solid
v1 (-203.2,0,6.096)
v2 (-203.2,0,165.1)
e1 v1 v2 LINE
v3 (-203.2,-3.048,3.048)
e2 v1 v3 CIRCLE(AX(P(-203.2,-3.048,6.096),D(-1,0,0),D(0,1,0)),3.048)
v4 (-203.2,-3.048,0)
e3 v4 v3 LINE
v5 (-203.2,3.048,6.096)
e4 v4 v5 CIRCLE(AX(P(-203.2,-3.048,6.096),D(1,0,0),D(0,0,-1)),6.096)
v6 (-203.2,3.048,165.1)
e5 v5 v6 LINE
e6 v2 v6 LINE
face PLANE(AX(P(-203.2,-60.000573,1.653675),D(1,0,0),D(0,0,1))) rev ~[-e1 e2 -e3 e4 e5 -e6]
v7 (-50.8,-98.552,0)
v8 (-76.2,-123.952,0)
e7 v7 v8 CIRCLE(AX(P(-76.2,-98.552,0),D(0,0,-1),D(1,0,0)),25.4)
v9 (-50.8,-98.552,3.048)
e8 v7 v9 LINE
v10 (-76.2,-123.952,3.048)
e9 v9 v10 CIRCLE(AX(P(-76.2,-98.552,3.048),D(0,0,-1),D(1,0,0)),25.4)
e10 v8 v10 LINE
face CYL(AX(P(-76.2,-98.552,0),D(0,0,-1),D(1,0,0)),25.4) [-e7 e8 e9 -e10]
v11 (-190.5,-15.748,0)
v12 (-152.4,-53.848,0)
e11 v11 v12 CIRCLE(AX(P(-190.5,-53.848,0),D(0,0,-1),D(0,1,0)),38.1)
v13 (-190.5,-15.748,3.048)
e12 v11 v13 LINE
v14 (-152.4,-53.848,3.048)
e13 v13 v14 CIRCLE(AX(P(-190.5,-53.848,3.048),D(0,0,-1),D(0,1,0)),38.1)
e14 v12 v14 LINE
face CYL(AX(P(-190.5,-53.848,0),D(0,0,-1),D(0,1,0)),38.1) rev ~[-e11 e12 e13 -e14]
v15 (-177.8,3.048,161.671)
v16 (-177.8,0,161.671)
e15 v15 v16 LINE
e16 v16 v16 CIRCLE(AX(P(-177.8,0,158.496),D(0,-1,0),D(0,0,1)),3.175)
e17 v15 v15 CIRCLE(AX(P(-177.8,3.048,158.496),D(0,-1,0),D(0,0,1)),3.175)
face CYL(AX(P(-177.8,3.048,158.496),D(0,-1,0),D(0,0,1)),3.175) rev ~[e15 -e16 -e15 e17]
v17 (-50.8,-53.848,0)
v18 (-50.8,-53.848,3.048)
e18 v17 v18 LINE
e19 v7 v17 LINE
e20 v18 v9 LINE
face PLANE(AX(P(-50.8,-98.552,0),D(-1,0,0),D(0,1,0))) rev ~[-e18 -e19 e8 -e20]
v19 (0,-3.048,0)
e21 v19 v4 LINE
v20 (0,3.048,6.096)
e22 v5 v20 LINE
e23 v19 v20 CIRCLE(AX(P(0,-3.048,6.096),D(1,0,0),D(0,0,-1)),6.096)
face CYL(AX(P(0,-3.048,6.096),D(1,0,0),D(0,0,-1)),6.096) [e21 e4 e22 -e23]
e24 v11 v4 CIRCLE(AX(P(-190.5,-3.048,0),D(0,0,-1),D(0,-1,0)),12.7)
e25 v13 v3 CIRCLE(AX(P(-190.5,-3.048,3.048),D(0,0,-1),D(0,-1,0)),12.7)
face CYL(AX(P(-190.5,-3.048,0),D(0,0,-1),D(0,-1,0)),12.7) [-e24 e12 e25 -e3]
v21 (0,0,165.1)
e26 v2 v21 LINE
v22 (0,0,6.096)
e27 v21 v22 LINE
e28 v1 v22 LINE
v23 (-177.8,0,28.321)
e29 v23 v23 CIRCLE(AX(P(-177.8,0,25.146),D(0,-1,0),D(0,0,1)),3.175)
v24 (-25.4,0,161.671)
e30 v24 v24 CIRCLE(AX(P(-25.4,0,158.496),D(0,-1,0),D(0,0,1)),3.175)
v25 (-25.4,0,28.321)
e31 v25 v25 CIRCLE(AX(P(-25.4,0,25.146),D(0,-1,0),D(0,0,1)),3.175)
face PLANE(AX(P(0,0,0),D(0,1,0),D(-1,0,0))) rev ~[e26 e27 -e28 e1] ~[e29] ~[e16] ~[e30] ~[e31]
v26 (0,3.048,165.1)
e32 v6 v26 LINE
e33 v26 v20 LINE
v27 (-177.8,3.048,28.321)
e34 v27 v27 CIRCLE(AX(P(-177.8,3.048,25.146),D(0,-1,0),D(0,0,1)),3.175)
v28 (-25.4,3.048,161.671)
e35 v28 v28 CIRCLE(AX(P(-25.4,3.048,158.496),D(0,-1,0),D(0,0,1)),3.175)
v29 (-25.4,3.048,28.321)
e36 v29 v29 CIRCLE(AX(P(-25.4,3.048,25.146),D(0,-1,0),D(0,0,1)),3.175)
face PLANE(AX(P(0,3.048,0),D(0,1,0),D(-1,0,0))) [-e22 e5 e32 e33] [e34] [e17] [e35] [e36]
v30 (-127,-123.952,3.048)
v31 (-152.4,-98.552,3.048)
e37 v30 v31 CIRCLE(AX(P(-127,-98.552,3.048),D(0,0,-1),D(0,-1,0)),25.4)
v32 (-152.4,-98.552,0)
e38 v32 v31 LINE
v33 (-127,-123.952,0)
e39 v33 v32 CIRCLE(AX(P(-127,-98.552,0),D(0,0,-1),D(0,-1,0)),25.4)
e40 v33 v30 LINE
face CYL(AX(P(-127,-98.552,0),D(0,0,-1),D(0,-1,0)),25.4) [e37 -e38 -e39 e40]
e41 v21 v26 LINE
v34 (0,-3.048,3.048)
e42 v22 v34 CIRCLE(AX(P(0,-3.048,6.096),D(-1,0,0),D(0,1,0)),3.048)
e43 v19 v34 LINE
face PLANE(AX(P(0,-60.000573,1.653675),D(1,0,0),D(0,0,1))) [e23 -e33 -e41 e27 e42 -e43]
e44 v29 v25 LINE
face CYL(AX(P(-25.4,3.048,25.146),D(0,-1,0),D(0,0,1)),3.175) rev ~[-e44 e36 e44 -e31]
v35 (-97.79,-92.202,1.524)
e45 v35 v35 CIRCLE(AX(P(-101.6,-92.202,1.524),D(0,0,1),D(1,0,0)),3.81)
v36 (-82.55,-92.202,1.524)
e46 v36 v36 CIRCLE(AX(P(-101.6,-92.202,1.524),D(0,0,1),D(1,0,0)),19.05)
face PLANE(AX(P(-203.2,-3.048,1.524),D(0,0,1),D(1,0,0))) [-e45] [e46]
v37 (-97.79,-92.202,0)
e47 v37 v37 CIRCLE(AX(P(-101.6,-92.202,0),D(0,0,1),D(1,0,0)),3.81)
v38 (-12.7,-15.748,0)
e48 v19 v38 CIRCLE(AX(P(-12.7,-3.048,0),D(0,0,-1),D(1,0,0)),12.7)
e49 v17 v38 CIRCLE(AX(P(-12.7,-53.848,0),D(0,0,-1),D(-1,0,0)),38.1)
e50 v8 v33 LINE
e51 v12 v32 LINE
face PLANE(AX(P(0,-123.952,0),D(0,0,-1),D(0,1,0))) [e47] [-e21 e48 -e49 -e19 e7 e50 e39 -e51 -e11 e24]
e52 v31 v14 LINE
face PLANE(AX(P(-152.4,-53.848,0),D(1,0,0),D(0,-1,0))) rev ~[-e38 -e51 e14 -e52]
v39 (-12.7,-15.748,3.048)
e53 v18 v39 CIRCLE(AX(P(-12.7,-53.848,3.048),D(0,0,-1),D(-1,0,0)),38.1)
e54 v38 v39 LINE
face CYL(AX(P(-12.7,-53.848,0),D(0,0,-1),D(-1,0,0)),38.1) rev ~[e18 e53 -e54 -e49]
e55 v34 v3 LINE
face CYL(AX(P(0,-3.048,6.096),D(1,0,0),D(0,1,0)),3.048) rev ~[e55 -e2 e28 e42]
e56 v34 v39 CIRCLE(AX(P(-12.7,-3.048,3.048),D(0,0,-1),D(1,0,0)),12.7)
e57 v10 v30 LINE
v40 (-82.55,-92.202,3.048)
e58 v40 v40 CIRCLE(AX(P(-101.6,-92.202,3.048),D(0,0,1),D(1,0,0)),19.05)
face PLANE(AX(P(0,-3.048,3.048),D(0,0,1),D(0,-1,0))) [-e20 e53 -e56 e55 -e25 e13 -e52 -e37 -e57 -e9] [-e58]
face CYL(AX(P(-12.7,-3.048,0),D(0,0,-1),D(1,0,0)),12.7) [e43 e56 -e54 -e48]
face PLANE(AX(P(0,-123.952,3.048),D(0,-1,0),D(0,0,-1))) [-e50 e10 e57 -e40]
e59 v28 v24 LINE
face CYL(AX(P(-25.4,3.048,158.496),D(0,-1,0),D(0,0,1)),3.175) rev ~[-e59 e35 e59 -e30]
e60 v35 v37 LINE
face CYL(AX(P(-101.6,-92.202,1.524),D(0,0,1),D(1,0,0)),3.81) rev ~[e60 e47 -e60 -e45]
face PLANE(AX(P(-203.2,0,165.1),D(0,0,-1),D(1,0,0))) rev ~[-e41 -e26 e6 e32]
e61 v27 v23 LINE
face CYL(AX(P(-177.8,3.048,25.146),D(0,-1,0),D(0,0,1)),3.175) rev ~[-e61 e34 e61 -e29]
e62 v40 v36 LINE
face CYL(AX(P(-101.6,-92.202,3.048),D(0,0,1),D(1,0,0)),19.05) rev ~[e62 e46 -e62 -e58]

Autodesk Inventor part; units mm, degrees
ref_plane "YZ Plane" through (0, 0, 0) normal (1, 0, 0) x (0, 1, 0)
ref_plane "XZ Plane" through (0, 0, 0) normal (0, 1, 0) x (-1, 0, 0)
ref_plane "XY Plane" through (0, 0, 0) normal (0, 0, 1) x (1, 0, 0)
sketch "Sketch1" plane through (0, 0, 0) normal (0, 1, 0) x (-1, 0, 0)
  line L0 (0, 0) -> (203.2, 0)
  line L1 (203.2, 0) -> (203.2, 165.1)
  line L2 (203.2, 165.1) -> (0, 165.1)
  line L3 (0, 165.1) -> (0, 0)
  dimension "d0" = 203.2
  dimension "d1" = 165.1
extrude "Plate2" add sketch "Sketch1" along normal blind 3.048
sketch "Sketch4" plane through (0, 3.048, 3.048) normal (0, 0, -1) x (-1, 0, 0)
  line L0 (203.2, 0) -> (0, 0)
  line L1 (0, 0) -> (0, -127)
  line L2 (0, -127) -> (203.2, -127)
  line L3 (203.2, -127) -> (203.2, 0)
edge flange "Flange1" height 127 angle 90 thickness 3.048 bend radius 3.048 thickness toward (0, 0, -1) relief straight relief width 3.048 relief depth 1.524 edges at (-101.6, 0, 0) wall of the first edge with corners at (-203.2, 3.048, 3.048) (0, 3.048, 3.048) (0, -123.952, 3.048) (-203.2, -123.952, 3.048)
bend "Bend1"
corner "Corner1"
sketch "Sketch5" plane through (0, 3.048, 0) normal (0, 1, 0) x (1, 0, 0)
  line L0 (0, -6.096) -> (-203.2, -6.096) projected
  line L1 (-203.2, -165.1) -> (-203.2, -6.096) projected
  line L2 (0, -6.096) -> (0, -165.1) projected
  point P0 (0, 0)
  point P1 (-177.8, -25.146)
  point P2 (-25.4, -25.146)
  point P3 (-25.4, -158.496)
  point P4 (-177.8, -158.496)
  dimension "d27" = 25.4
  dimension "d28" = 25.4
  dimension "d29" = 19.05
  dimension "d30" = 133.35
hole "Hole2" at (-177.8, 3.048, 25.146) at (-25.4, 3.048, 25.146) at (-25.4, 3.048, 158.496) at (-177.8, 3.048, 158.496) direction (0, -1, 0) diameter 6.35 end through all
sketch "Sketch6" plane through (0, -123.952, 0) normal (0, 0, -1) x (-1, 0, 0)
  line L0 (203.2, 120.904) -> (0, 120.904) projected
  line L1 (0, 0) -> (0, 120.904) projected
  line L2 (203.2, 0) -> (0, 0) projected
  line L3 (203.2, 120.904) -> (203.2, 0) projected
  line L4 (50.8, 120.904) -> (152.4, 120.904)
  line L5 (152.4, 70.104) -> (152.4, 25.4)
  line L6 (127, 0) -> (76.2, 0)
  line L7 (50.8, 25.4) -> (50.8, 70.104)
  arc A0 (50.8, 25.4) -> (76.2, 0) centre (76.2, 25.4) ccw
  arc A1 (127, 0) -> (152.4, 25.4) centre (127, 25.4) ccw
  line L8 (12.7, 108.204) -> (12.7, 108.204)
  line L9 (0, 0) -> (0, 108.204)
  line L10 (0, 0) -> (76.2, 0)
  line L11 (203.2, 0) -> (127, 0)
  line L12 (190.5, 108.204) -> (190.5, 108.204)
  line L13 (203.2, 108.204) -> (203.2, 0)
  arc A2 (50.8, 70.104) -> (12.7, 108.204) centre (12.7, 70.104) ccw
  arc A3 (190.5, 108.204) -> (152.4, 70.104) centre (190.5, 70.104) ccw
  line L14 (0, 120.904) -> (0, 120.904)
  line L15 (203.2, 120.904) -> (203.2, 120.904)
  arc A4 (190.5, 108.204) -> (203.2, 120.904) centre (190.5, 120.904) ccw
  arc A5 (0, 120.904) -> (12.7, 108.204) centre (12.7, 120.904) ccw
  point P0 (0, 123.952)
  point P1 (152.4, 0)
  point P2 (50.8, 0)
  dimension "d38" = 101.6
  dimension "d40" = 50.8
  dimension "d41" = 50.8
  dimension "d42" = 25.4
  dimension "d43" = 12.7
  dimension "d44" = 38.1
  dimension "d47" = 12.7
extrude "Extrusion2" cut sketch "Sketch6" against normal through all contours L3 L2 A1 L5 A3 A4 | A5 A2 L7 A0 L2 L1
sketch "Sketch8" plane through (-203.2, -3.048, 3.048) normal (0, 0, 1) x (1, 0, 0)
  line L0 (76.2, -120.904) -> (127, -120.904) projected
  line L1 (152.4, -95.504) -> (152.4, -50.8) projected
  line L2 (50.8, -50.8) -> (50.8, -95.504) projected
  circle A0 centre (101.6, -89.154) radius 19.05
  point P0 (203.2, 3.048)
  dimension "d53" = 38.1
  dimension "d54" = 50.8
  dimension "d55" = 50.8
  dimension "d56" = 31.75
extrude "Extrusion3" cut sketch "Sketch8" against normal blind 1.524
sketch "Sketch9" plane through (-101.6, -92.202, 1.524) normal (0, 0, 1) x (1, 0, 0)
  circle A0 centre (0, 0) radius 19.05 projected
  circle A1 centre (0, 0) radius 3.81
  point P0 (101.6, 92.202)
  dimension "d59" = 7.62
extrude "Extrusion4" cut sketch "Sketch9" against normal through all contours A1
equation "\"d40\" = d41"
equation "\"d17\" = BendReliefWidth"
equation "\"d18\" = BendReliefDepth"
equation "\"d19\" = MinimumRemnant"
equation "\"d20\" = BendRadius"
equation "\"d23\" = BendRadius"
equation "\"d24\" = CornerReliefSize"
equation "\"d25\" = GapSize"
equation "\"d26\" = JacobiRadiusSize"
equation "\"d54\" = d55"
equation "\"BendRadius\" = Thickness"
equation "\"BendReliefWidth\" = Thickness"
equation "\"BendReliefDepth\" = 0.5 * Thickness"
equation "\"CornerReliefSize\" = 4 * Thickness"
equation "\"MinimumRemnant\" = 2 * Thickness"
equation "\"TransitionRadius\" = BendRadius"
equation "\"JacobiRadiusSize\" = Thickness"
equation "\"GapSize\" = Thickness"
equation "\"d15\" = BendRadius"
equation "\"d16\" = BendRadius"
equation "\"Thickness\" = 3.048"
properties part number "backplate"
